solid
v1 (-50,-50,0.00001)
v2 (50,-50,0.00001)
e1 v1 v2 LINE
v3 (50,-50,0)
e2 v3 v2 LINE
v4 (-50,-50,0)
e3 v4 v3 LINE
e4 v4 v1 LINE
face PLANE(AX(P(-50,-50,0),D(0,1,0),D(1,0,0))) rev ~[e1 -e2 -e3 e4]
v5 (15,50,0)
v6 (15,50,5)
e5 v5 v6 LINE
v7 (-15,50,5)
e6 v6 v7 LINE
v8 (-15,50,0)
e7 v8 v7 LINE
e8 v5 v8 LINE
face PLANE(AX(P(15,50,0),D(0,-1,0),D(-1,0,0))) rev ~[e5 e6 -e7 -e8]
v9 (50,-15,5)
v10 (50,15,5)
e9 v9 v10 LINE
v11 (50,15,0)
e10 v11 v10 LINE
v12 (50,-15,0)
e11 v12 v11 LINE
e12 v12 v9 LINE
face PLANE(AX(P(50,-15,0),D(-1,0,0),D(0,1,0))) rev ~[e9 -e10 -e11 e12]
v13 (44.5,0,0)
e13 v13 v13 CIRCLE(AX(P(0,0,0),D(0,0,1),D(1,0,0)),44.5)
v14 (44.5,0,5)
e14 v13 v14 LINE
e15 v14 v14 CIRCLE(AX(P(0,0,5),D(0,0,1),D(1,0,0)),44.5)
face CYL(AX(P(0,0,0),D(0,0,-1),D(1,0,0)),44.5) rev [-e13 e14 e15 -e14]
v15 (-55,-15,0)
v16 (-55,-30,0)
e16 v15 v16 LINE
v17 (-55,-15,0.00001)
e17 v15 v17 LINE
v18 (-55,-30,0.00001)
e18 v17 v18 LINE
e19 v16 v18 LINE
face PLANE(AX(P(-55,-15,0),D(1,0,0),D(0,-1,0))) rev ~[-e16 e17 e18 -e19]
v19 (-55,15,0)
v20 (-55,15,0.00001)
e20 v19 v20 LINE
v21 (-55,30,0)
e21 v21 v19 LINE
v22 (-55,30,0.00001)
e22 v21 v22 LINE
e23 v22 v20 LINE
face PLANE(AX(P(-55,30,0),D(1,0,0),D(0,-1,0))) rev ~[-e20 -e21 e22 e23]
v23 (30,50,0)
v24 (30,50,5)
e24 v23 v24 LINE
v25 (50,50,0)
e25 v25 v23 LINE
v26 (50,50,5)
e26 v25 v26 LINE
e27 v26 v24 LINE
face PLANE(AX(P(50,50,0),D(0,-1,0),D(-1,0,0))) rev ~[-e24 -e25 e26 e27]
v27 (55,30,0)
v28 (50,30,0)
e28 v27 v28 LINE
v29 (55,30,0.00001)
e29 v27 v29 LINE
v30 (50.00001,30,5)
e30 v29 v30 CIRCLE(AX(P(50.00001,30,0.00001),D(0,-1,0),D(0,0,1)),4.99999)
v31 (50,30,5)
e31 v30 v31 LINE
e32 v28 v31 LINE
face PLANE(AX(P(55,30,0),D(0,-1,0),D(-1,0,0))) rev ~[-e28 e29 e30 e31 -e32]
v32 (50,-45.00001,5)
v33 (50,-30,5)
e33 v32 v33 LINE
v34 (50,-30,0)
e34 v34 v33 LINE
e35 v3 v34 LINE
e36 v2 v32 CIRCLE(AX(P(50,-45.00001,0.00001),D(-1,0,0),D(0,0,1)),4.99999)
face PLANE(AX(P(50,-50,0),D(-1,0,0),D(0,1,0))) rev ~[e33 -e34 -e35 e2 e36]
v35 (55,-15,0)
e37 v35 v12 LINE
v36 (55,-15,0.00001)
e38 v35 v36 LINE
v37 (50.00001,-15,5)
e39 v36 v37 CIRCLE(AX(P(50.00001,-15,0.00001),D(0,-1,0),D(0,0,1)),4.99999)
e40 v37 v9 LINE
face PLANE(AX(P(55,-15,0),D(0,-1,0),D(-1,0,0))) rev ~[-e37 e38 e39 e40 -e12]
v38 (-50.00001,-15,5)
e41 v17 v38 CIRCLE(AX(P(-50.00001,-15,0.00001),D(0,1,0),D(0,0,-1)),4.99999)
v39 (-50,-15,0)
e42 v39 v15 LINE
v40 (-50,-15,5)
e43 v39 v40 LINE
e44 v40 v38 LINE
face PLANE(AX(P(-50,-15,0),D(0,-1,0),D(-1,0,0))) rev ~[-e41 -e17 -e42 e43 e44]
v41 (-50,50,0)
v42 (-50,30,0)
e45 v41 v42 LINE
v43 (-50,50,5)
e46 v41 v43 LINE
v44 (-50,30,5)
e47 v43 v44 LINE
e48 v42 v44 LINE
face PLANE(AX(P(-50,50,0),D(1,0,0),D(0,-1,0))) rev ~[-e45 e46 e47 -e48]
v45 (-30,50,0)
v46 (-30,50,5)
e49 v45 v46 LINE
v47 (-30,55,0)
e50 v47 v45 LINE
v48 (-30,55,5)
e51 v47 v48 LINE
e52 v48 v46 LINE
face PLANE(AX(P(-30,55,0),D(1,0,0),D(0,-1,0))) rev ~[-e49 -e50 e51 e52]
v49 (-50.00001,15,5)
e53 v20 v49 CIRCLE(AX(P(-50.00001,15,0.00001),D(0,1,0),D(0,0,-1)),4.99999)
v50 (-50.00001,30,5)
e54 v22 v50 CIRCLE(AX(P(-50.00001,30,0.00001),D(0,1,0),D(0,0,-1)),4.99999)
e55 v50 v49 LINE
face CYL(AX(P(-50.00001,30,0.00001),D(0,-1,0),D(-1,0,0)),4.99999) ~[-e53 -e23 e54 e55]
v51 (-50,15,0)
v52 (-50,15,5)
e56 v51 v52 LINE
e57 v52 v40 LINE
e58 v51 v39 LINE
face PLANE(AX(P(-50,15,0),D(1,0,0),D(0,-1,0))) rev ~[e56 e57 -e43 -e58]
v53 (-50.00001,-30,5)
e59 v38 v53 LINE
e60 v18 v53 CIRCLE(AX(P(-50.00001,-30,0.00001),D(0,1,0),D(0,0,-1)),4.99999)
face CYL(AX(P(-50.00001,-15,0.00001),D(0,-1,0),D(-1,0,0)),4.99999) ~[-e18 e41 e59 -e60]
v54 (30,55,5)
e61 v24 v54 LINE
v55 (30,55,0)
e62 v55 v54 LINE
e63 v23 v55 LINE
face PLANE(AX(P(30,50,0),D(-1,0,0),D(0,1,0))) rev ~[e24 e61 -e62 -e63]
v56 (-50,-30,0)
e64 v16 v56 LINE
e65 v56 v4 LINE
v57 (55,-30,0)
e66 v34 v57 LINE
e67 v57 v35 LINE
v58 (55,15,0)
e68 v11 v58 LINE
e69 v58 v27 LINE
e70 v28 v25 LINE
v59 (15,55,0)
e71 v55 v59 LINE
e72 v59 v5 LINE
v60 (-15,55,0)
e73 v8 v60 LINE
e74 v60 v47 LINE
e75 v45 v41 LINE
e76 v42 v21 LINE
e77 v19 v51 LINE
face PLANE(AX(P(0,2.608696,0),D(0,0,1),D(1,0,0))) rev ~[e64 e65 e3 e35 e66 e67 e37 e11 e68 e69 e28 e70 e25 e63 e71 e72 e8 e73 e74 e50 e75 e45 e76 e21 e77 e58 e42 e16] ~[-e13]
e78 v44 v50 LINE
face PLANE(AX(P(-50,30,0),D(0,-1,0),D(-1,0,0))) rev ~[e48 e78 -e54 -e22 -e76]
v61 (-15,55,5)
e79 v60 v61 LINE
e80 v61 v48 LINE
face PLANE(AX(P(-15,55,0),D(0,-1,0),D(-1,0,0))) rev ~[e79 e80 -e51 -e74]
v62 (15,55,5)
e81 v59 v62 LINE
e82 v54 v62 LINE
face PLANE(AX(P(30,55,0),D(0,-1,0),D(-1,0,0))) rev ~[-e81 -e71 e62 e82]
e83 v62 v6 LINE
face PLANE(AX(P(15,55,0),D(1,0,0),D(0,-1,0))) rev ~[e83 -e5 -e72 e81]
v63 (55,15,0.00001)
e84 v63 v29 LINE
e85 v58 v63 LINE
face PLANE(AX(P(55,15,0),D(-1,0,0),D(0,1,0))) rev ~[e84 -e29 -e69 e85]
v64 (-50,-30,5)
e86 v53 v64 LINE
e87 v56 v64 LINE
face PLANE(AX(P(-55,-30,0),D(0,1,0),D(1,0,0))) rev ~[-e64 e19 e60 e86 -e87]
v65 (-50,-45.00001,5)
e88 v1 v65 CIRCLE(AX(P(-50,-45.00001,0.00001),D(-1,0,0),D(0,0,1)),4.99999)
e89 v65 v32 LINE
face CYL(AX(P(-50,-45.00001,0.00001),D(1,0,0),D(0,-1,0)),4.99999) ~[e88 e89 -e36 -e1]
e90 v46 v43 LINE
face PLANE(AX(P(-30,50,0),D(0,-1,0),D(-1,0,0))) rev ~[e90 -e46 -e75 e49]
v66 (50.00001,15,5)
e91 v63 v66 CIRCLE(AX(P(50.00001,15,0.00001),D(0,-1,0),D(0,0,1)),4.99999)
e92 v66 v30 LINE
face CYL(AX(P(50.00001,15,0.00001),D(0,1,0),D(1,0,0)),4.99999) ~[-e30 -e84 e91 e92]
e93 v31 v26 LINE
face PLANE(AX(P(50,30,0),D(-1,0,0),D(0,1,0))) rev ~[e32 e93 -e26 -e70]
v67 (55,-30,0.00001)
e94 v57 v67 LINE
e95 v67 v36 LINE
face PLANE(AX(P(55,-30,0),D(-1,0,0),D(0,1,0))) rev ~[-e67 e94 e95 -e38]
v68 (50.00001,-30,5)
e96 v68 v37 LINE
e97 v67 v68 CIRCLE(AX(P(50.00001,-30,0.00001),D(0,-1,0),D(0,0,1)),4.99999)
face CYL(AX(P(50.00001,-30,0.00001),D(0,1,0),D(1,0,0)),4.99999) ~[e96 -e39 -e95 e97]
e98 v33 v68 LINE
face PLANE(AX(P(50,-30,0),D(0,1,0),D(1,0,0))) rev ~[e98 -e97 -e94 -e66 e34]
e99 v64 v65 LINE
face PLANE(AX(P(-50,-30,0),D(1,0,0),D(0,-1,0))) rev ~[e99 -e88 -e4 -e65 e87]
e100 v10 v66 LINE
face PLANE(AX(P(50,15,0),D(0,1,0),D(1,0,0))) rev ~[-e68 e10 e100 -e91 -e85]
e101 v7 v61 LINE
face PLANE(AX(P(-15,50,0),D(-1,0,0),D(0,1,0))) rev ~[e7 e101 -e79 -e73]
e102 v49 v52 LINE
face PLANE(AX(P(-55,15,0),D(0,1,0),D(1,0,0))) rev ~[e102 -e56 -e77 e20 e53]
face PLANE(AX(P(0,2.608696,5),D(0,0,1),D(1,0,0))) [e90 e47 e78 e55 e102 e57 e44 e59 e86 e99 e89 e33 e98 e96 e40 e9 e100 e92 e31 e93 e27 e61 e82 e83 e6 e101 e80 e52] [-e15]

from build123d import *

# Parameters (mm, degrees)
F0_R     = 44.5
F1_DEPTH = 5
F2_R     = 4.99999


# Not quite as in the source:
# - a fillet or chamfer is up to 0.001 mm smaller than in the source, because OpenCascade refuses the exact size


with BuildPart() as f1:
    # F0 (on Top) → F1 (new body)
    with BuildSketch(Plane.XY):
        Polygon((-30, 50), (-50, 50), (-50, 30), (-55, 30), (-55, 15), (-50, 15), (-50, -15), (-55, -15), (-55, -30), (-50, -30), (-50, -50), (50, -50), (50, -30), (55, -30), (55, -15), (50, -15), (50, 15), (55, 15), (55, 30), (50, 30), (50, 50), (30, 50), (30, 55), (15, 55), (15, 50), (-15, 50), (-15, 55), (-30, 55), align=None)
        Circle(F0_R, mode=Mode.SUBTRACT)
    extrude(amount=F1_DEPTH)

    # F2 (radius 5 in the source; OpenCascade refuses exactly that, so slightly less here)
    f2_edges = [f1.edges().sort_by_distance(p)[0] for p in [
        (0, -50, 5),
        (55, -22.5, 5),
        (55, 22.5, 5),
        (-55, 22.5, 5),
        (-55, -22.5, 5),
    ]]
    fillet(f2_edges, radius=F2_R)


solid = f1.part
